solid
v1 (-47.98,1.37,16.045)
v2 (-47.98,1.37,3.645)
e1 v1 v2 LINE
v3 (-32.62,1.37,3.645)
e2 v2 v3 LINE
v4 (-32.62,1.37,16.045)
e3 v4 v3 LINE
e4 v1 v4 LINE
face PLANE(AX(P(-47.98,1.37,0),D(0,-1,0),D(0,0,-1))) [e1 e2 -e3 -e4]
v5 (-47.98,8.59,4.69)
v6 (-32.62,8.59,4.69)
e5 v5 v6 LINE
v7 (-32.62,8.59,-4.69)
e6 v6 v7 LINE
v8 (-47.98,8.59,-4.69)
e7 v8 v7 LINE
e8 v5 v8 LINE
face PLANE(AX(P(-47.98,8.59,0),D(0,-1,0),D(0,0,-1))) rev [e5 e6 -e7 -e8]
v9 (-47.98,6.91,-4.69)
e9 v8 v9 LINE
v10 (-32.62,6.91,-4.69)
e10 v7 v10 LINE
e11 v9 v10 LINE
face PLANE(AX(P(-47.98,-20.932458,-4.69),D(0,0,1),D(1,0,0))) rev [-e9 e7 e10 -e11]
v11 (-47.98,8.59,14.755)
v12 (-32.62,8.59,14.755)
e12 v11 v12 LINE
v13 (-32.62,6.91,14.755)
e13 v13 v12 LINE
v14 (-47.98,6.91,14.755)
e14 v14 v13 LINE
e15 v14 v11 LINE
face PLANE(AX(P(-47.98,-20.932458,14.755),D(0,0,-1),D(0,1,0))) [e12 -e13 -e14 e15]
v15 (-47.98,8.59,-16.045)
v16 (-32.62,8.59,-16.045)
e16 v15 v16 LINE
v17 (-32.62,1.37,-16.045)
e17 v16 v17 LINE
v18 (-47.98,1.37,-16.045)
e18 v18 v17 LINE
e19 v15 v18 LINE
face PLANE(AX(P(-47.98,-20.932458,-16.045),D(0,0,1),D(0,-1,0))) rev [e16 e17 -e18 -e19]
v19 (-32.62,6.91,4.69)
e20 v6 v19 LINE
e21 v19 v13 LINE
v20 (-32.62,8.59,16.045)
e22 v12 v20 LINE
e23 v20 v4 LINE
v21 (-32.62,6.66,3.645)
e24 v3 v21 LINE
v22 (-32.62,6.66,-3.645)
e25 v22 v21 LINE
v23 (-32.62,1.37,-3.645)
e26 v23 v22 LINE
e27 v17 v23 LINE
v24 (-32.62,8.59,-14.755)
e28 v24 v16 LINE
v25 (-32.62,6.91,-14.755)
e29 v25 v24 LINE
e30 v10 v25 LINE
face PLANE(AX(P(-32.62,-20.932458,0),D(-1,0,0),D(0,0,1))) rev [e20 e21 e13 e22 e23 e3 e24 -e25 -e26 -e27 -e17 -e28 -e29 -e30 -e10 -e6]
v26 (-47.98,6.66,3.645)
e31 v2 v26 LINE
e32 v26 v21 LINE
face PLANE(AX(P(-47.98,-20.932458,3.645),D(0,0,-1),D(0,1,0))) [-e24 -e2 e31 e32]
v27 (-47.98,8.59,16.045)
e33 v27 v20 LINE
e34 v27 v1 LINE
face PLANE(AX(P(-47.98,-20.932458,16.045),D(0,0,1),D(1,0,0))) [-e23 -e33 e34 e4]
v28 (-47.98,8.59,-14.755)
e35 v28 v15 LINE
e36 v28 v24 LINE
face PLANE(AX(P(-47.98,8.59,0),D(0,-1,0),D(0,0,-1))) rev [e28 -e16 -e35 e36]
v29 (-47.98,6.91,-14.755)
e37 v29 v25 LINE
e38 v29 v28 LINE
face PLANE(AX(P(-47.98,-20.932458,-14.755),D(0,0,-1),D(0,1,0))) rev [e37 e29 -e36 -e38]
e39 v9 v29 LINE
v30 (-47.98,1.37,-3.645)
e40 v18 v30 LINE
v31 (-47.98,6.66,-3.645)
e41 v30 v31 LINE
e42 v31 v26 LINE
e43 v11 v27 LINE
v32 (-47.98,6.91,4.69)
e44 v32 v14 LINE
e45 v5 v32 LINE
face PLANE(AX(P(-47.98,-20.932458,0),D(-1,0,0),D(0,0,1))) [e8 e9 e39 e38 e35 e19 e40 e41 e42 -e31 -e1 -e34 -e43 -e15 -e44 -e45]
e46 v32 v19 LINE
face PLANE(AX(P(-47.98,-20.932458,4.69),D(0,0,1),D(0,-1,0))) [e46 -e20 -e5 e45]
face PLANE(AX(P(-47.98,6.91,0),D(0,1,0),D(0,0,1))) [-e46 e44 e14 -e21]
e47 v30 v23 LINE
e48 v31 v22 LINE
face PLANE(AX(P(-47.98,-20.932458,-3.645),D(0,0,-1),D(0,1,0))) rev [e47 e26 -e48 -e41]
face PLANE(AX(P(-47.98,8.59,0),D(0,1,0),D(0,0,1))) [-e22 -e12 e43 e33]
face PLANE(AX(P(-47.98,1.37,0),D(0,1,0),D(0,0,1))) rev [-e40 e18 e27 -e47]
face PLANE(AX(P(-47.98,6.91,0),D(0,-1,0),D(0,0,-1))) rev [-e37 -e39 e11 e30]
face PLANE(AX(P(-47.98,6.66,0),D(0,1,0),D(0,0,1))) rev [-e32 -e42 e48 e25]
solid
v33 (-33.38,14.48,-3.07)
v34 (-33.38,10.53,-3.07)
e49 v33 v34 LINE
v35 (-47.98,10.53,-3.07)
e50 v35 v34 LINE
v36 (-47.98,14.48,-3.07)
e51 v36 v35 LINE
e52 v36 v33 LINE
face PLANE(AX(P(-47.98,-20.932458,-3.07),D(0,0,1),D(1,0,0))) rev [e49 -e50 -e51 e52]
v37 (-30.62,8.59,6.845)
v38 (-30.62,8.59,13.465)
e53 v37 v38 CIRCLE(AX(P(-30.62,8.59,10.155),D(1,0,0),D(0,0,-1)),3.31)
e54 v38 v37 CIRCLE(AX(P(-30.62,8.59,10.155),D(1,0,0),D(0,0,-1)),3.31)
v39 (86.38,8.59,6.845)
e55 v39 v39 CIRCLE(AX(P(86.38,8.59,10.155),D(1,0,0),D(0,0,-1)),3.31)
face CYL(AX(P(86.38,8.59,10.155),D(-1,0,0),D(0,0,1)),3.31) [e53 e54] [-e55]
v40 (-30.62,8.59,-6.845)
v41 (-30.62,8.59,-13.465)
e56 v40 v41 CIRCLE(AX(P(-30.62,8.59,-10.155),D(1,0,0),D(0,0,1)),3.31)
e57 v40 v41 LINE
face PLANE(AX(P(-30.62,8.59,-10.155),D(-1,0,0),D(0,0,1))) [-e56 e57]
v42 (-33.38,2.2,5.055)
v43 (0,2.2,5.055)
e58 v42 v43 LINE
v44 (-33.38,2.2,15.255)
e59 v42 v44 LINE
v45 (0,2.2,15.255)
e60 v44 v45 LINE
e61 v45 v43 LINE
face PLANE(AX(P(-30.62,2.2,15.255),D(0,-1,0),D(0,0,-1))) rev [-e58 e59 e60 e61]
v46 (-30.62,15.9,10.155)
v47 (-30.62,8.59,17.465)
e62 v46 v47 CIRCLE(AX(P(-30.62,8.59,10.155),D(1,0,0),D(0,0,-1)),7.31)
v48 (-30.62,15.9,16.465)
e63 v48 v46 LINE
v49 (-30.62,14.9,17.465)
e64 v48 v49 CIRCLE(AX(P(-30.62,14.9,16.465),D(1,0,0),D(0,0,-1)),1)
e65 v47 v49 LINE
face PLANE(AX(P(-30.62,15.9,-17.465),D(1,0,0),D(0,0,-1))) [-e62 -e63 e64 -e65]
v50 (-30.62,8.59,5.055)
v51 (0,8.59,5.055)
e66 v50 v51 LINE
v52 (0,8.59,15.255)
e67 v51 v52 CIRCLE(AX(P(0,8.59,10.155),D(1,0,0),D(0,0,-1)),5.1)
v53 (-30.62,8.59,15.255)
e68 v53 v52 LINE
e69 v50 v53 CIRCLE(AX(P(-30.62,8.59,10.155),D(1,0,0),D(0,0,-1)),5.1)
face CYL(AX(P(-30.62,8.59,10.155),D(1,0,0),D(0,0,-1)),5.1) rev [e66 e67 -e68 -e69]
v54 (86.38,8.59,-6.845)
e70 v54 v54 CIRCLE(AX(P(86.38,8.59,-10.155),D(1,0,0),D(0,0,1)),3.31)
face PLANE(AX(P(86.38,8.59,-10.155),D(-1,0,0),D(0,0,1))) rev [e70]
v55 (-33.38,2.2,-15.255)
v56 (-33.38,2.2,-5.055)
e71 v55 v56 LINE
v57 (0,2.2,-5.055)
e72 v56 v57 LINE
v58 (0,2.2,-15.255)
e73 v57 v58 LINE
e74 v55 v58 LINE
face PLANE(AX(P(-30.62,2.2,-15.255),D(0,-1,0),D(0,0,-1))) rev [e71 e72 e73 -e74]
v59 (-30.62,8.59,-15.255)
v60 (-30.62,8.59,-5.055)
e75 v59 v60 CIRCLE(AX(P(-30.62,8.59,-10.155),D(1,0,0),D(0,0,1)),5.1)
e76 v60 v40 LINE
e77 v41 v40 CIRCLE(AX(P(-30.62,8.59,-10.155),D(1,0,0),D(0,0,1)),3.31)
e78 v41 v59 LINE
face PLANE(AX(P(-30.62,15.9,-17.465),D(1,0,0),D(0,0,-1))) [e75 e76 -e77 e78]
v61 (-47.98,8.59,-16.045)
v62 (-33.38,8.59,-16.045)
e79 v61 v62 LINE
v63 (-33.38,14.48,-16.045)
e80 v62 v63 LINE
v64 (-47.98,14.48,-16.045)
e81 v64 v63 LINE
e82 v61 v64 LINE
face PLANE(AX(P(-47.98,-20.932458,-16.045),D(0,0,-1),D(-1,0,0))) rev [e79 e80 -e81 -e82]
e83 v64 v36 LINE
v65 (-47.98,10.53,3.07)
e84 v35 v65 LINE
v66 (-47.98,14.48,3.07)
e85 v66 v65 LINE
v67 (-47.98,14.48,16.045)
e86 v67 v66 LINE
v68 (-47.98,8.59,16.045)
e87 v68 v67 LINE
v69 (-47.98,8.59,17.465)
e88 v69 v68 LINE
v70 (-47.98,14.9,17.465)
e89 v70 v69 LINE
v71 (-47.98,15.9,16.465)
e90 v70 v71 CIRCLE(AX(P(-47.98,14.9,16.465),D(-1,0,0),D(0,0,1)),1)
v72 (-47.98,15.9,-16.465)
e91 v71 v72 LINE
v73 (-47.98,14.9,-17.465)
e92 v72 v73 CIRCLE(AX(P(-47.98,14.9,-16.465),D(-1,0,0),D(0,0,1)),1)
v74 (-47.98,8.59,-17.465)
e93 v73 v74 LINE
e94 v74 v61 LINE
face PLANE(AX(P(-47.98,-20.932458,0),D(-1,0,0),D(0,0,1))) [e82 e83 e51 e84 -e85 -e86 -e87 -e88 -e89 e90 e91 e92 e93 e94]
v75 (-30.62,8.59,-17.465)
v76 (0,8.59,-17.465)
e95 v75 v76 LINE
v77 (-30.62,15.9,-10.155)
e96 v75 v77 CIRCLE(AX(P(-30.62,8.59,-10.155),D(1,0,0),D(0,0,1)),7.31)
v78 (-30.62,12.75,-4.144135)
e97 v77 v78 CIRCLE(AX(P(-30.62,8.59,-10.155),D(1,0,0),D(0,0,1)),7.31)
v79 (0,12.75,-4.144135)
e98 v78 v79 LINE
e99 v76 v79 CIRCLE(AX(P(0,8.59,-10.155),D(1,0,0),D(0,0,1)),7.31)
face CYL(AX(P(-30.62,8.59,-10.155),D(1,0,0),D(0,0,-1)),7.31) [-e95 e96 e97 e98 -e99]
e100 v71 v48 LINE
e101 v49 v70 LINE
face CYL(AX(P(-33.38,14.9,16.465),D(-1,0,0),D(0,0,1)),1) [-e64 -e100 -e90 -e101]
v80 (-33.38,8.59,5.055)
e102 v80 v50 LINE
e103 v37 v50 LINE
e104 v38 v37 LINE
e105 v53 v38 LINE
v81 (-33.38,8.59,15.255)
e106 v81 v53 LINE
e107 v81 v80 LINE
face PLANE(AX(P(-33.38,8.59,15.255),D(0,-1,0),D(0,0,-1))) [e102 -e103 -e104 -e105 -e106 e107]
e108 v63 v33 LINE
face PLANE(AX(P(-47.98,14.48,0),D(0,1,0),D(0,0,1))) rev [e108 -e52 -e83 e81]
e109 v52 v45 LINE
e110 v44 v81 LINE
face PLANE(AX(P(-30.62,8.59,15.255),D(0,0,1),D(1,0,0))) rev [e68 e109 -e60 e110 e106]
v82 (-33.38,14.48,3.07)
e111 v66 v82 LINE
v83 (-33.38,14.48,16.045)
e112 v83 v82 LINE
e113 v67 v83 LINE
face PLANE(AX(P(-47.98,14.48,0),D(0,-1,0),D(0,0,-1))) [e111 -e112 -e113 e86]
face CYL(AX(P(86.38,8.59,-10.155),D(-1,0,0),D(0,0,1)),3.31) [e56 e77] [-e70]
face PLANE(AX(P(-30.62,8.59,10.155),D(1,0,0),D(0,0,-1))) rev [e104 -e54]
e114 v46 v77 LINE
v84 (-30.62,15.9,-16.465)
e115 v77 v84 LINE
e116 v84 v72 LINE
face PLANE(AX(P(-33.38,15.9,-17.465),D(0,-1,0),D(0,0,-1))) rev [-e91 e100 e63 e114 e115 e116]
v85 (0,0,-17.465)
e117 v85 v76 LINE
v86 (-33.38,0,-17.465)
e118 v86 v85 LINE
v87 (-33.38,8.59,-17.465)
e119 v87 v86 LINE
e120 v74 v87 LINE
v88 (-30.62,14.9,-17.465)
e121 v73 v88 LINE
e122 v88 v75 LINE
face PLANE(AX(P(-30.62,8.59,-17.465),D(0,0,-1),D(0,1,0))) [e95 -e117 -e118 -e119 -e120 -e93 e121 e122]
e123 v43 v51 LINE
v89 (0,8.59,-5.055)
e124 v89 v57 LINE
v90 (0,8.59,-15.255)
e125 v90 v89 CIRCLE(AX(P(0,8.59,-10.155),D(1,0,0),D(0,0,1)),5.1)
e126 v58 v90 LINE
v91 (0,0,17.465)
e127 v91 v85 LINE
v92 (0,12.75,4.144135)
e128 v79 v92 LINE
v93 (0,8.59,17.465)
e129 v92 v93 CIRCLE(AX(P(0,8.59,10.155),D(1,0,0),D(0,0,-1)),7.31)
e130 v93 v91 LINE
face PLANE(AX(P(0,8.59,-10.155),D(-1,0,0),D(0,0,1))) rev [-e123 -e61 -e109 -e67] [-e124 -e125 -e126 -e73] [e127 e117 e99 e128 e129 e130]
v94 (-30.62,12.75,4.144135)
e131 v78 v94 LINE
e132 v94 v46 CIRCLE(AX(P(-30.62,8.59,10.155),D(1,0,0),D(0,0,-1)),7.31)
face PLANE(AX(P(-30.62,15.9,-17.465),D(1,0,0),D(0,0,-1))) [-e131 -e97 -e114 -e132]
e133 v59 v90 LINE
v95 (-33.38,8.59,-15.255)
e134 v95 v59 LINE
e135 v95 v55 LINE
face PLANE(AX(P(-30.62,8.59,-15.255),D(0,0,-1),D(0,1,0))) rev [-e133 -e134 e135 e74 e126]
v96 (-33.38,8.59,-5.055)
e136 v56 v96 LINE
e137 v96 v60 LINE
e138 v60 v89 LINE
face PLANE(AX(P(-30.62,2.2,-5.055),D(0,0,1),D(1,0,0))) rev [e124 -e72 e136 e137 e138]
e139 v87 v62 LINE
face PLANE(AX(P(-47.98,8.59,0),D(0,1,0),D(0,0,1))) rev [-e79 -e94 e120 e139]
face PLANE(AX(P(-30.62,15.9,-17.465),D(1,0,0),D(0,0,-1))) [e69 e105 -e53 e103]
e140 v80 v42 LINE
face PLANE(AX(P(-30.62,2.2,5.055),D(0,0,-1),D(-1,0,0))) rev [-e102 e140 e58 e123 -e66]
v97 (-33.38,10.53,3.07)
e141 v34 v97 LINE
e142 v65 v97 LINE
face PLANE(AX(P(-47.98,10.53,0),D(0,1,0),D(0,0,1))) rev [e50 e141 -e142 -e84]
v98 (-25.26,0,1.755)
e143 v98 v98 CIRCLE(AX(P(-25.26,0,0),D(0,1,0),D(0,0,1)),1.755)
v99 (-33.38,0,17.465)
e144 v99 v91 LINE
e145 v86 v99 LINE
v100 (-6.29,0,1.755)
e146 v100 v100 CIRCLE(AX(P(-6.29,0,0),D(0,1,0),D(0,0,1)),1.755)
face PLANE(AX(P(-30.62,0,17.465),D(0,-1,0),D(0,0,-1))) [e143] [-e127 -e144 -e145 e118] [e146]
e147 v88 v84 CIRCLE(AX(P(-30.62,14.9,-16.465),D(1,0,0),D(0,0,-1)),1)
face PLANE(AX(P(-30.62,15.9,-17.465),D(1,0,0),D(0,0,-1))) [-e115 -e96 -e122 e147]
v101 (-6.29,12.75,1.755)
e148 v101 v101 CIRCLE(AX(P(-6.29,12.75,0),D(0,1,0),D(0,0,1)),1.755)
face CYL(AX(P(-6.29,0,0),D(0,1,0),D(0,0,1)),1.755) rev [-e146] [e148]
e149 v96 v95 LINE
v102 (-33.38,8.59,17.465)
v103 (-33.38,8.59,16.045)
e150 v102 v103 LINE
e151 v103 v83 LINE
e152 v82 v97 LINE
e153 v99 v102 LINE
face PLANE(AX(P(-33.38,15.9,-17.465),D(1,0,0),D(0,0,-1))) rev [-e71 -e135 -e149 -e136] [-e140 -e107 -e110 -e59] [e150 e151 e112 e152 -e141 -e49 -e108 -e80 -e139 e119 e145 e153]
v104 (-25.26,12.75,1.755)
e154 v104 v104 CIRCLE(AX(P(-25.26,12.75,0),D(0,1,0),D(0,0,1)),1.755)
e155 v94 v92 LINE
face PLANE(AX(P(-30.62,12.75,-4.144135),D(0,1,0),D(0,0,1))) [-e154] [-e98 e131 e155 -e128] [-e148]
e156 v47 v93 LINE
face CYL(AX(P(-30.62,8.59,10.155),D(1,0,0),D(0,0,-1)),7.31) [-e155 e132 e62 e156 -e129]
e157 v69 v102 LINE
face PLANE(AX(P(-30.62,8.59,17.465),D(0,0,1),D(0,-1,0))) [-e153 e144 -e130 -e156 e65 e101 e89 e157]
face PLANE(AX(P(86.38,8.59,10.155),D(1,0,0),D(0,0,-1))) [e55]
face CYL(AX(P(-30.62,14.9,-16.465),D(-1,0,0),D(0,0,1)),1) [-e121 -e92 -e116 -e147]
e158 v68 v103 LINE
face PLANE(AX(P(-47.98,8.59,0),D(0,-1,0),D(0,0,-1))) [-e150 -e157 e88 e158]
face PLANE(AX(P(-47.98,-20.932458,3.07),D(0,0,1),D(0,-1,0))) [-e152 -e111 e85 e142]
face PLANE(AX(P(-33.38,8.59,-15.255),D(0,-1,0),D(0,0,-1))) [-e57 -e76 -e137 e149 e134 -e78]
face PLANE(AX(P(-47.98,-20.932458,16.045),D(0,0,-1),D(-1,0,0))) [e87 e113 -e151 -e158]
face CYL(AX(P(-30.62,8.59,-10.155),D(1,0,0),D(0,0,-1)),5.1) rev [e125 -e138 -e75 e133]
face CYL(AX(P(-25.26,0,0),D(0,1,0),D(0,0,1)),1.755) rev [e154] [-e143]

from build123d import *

# Parameters (mm, degrees)
EXTRUDE1_DEPTH  = 30.62
SKETCH2_W       = 34.93
SKETCH2_H       = 15.9
SKETCH2_W_2     = 10.2
SKETCH2_H_2     = 6.39
EXTRUDE2_DEPTH  = 2.76
EXTRUDE3_DEPTH  = 15.36
EXTRUDE4_DEPTH  = 15.36
FILLET1_R       = 1
SKETCH4_R       = 3.31
EXTRUDE5_DEPTH  = 117
HOLE1_OUTLINE_R = 1.755
HOLE1_DEPTH     = 12.75
LPATTERN1_COUNT = 2
LPATTERN1_PITCH = 18.97


# Read off the part's stored shape, not the designer's step: Hole1
with BuildPart() as part:
    # Sketch1 → Extrude1 (new body)
    with BuildSketch(Plane(origin=(0, 0, 0), x_dir=(0, 0, -1), z_dir=(1, 0, 0))):
        with BuildLine():
            Line((4.144134838, 12.75), (-4.144134838, 12.75))
            ThreePointArc((-4.144134838, 12.75), (-12.334068111, 15.567661655), (-17.465, 8.59))
            Line((-17.465, 8.59), (-17.465, 0))
            Line((-17.465, 0), (17.465, 0))
            Line((17.465, 0), (17.465, 8.59))
            ThreePointArc((17.465, 8.59), (12.334068111, 15.567661655), (4.144134838, 12.75))
        make_face()
        with BuildLine():
            Line((-15.255, 8.59), (-15.255, 2.2))
            Line((-15.255, 2.2), (-5.055, 2.2))
            Line((-5.055, 2.2), (-5.055, 8.59))
            ThreePointArc((-5.055, 8.59), (-10.155, 13.69), (-15.255, 8.59))
        make_face(mode=Mode.SUBTRACT)
        with BuildLine():
            Line((5.055, 2.2), (5.055, 8.59))
            ThreePointArc((5.055, 8.59), (10.155, 13.69), (15.255, 8.59))
            Line((15.255, 8.59), (15.255, 2.2))
            Line((15.255, 2.2), (5.055, 2.2))
        make_face(mode=Mode.SUBTRACT)
    extrude(amount=-EXTRUDE1_DEPTH)

    # Sketch2 → Extrude2 (add)
    with BuildSketch(Plane.ZY.offset(30.62)):
        with Locations((0, 7.95)):
            Rectangle(SKETCH2_W, SKETCH2_H)
        with Locations((-10.155, 5.395)):
            Rectangle(SKETCH2_W_2, SKETCH2_H_2, mode=Mode.SUBTRACT)
        with Locations((10.155, 5.395)):
            Rectangle(SKETCH2_W_2, SKETCH2_H_2, mode=Mode.SUBTRACT)
    extrude(amount=EXTRUDE2_DEPTH)

    # Sketch3 → Extrude3 (add)
    with BuildSketch(Plane.ZY.offset(32.62)):
        Polygon((0, 10.53), (0, 15.9), (-17.465, 15.9), (-17.465, 8.59), (-16.045, 8.59), (-16.045, 14.48), (-3.07, 14.48), (-3.07, 10.53), align=None)
        Polygon((17.465, 15.9), (0, 15.9), (0, 10.53), (3.07, 10.53), (3.07, 14.48), (16.045, 14.48), (16.045, 8.59), (17.465, 8.59), align=None)
    extrude(amount=EXTRUDE3_DEPTH)

    # Fillet1
    fillet1_edges = [part.edges().sort_by_distance(p)[0] for p in [
        (-39.3, 15.9, -17.465),
        (-39.3, 15.9, 17.465),
    ]]
    fillet(fillet1_edges, radius=FILLET1_R)

    # Sketch4 → Extrude5 (add)
    with BuildSketch(Plane(origin=(-30.62, 0, 0), x_dir=(0, 0, -1), z_dir=(1, 0, 0))):
        with Locations((-10.155, 8.59)):
            Circle(SKETCH4_R)
        with Locations(Location((10.155, 8.59, 0), (0, 0, 180))):
            Circle(SKETCH4_R)
    extrude(amount=EXTRUDE5_DEPTH)

    # Hole1 outline → Hole1 (cut)
    with BuildSketch(Plane(origin=(0, 0, 0), x_dir=(1, 0, 0), z_dir=(0, 1, 0))):
        with Locations((-6.29, 0)):
            Circle(HOLE1_OUTLINE_R)
    hole1 = extrude(amount=HOLE1_DEPTH, mode=Mode.SUBTRACT)

    # LPattern1: Hole1 ×2
    with Locations(*[(-i * LPATTERN1_PITCH, 0, 0) for i in range(1, LPATTERN1_COUNT)]):
        add(hole1, mode=Mode.SUBTRACT)


with BuildPart() as body_2:
    # Sketch → Extrude4 (new body)
    with BuildSketch(Plane.ZY.offset(32.62)):
        Polygon((0, 6.66), (0, 8.59), (-4.69, 8.59), (-4.69, 6.91), (-14.755, 6.91), (-14.755, 8.59), (-16.045, 8.59), (-16.045, 1.37), (-3.645, 1.37), (-3.645, 6.66), align=None)
        Polygon((4.69, 8.59), (0, 8.59), (0, 6.66), (3.645, 6.66), (3.645, 1.37), (16.045, 1.37), (16.045, 8.59), (14.755, 8.59), (14.755, 6.91), (4.69, 6.91), align=None)
    extrude(amount=EXTRUDE4_DEPTH)


solid = Compound([part.part, body_2.part])
